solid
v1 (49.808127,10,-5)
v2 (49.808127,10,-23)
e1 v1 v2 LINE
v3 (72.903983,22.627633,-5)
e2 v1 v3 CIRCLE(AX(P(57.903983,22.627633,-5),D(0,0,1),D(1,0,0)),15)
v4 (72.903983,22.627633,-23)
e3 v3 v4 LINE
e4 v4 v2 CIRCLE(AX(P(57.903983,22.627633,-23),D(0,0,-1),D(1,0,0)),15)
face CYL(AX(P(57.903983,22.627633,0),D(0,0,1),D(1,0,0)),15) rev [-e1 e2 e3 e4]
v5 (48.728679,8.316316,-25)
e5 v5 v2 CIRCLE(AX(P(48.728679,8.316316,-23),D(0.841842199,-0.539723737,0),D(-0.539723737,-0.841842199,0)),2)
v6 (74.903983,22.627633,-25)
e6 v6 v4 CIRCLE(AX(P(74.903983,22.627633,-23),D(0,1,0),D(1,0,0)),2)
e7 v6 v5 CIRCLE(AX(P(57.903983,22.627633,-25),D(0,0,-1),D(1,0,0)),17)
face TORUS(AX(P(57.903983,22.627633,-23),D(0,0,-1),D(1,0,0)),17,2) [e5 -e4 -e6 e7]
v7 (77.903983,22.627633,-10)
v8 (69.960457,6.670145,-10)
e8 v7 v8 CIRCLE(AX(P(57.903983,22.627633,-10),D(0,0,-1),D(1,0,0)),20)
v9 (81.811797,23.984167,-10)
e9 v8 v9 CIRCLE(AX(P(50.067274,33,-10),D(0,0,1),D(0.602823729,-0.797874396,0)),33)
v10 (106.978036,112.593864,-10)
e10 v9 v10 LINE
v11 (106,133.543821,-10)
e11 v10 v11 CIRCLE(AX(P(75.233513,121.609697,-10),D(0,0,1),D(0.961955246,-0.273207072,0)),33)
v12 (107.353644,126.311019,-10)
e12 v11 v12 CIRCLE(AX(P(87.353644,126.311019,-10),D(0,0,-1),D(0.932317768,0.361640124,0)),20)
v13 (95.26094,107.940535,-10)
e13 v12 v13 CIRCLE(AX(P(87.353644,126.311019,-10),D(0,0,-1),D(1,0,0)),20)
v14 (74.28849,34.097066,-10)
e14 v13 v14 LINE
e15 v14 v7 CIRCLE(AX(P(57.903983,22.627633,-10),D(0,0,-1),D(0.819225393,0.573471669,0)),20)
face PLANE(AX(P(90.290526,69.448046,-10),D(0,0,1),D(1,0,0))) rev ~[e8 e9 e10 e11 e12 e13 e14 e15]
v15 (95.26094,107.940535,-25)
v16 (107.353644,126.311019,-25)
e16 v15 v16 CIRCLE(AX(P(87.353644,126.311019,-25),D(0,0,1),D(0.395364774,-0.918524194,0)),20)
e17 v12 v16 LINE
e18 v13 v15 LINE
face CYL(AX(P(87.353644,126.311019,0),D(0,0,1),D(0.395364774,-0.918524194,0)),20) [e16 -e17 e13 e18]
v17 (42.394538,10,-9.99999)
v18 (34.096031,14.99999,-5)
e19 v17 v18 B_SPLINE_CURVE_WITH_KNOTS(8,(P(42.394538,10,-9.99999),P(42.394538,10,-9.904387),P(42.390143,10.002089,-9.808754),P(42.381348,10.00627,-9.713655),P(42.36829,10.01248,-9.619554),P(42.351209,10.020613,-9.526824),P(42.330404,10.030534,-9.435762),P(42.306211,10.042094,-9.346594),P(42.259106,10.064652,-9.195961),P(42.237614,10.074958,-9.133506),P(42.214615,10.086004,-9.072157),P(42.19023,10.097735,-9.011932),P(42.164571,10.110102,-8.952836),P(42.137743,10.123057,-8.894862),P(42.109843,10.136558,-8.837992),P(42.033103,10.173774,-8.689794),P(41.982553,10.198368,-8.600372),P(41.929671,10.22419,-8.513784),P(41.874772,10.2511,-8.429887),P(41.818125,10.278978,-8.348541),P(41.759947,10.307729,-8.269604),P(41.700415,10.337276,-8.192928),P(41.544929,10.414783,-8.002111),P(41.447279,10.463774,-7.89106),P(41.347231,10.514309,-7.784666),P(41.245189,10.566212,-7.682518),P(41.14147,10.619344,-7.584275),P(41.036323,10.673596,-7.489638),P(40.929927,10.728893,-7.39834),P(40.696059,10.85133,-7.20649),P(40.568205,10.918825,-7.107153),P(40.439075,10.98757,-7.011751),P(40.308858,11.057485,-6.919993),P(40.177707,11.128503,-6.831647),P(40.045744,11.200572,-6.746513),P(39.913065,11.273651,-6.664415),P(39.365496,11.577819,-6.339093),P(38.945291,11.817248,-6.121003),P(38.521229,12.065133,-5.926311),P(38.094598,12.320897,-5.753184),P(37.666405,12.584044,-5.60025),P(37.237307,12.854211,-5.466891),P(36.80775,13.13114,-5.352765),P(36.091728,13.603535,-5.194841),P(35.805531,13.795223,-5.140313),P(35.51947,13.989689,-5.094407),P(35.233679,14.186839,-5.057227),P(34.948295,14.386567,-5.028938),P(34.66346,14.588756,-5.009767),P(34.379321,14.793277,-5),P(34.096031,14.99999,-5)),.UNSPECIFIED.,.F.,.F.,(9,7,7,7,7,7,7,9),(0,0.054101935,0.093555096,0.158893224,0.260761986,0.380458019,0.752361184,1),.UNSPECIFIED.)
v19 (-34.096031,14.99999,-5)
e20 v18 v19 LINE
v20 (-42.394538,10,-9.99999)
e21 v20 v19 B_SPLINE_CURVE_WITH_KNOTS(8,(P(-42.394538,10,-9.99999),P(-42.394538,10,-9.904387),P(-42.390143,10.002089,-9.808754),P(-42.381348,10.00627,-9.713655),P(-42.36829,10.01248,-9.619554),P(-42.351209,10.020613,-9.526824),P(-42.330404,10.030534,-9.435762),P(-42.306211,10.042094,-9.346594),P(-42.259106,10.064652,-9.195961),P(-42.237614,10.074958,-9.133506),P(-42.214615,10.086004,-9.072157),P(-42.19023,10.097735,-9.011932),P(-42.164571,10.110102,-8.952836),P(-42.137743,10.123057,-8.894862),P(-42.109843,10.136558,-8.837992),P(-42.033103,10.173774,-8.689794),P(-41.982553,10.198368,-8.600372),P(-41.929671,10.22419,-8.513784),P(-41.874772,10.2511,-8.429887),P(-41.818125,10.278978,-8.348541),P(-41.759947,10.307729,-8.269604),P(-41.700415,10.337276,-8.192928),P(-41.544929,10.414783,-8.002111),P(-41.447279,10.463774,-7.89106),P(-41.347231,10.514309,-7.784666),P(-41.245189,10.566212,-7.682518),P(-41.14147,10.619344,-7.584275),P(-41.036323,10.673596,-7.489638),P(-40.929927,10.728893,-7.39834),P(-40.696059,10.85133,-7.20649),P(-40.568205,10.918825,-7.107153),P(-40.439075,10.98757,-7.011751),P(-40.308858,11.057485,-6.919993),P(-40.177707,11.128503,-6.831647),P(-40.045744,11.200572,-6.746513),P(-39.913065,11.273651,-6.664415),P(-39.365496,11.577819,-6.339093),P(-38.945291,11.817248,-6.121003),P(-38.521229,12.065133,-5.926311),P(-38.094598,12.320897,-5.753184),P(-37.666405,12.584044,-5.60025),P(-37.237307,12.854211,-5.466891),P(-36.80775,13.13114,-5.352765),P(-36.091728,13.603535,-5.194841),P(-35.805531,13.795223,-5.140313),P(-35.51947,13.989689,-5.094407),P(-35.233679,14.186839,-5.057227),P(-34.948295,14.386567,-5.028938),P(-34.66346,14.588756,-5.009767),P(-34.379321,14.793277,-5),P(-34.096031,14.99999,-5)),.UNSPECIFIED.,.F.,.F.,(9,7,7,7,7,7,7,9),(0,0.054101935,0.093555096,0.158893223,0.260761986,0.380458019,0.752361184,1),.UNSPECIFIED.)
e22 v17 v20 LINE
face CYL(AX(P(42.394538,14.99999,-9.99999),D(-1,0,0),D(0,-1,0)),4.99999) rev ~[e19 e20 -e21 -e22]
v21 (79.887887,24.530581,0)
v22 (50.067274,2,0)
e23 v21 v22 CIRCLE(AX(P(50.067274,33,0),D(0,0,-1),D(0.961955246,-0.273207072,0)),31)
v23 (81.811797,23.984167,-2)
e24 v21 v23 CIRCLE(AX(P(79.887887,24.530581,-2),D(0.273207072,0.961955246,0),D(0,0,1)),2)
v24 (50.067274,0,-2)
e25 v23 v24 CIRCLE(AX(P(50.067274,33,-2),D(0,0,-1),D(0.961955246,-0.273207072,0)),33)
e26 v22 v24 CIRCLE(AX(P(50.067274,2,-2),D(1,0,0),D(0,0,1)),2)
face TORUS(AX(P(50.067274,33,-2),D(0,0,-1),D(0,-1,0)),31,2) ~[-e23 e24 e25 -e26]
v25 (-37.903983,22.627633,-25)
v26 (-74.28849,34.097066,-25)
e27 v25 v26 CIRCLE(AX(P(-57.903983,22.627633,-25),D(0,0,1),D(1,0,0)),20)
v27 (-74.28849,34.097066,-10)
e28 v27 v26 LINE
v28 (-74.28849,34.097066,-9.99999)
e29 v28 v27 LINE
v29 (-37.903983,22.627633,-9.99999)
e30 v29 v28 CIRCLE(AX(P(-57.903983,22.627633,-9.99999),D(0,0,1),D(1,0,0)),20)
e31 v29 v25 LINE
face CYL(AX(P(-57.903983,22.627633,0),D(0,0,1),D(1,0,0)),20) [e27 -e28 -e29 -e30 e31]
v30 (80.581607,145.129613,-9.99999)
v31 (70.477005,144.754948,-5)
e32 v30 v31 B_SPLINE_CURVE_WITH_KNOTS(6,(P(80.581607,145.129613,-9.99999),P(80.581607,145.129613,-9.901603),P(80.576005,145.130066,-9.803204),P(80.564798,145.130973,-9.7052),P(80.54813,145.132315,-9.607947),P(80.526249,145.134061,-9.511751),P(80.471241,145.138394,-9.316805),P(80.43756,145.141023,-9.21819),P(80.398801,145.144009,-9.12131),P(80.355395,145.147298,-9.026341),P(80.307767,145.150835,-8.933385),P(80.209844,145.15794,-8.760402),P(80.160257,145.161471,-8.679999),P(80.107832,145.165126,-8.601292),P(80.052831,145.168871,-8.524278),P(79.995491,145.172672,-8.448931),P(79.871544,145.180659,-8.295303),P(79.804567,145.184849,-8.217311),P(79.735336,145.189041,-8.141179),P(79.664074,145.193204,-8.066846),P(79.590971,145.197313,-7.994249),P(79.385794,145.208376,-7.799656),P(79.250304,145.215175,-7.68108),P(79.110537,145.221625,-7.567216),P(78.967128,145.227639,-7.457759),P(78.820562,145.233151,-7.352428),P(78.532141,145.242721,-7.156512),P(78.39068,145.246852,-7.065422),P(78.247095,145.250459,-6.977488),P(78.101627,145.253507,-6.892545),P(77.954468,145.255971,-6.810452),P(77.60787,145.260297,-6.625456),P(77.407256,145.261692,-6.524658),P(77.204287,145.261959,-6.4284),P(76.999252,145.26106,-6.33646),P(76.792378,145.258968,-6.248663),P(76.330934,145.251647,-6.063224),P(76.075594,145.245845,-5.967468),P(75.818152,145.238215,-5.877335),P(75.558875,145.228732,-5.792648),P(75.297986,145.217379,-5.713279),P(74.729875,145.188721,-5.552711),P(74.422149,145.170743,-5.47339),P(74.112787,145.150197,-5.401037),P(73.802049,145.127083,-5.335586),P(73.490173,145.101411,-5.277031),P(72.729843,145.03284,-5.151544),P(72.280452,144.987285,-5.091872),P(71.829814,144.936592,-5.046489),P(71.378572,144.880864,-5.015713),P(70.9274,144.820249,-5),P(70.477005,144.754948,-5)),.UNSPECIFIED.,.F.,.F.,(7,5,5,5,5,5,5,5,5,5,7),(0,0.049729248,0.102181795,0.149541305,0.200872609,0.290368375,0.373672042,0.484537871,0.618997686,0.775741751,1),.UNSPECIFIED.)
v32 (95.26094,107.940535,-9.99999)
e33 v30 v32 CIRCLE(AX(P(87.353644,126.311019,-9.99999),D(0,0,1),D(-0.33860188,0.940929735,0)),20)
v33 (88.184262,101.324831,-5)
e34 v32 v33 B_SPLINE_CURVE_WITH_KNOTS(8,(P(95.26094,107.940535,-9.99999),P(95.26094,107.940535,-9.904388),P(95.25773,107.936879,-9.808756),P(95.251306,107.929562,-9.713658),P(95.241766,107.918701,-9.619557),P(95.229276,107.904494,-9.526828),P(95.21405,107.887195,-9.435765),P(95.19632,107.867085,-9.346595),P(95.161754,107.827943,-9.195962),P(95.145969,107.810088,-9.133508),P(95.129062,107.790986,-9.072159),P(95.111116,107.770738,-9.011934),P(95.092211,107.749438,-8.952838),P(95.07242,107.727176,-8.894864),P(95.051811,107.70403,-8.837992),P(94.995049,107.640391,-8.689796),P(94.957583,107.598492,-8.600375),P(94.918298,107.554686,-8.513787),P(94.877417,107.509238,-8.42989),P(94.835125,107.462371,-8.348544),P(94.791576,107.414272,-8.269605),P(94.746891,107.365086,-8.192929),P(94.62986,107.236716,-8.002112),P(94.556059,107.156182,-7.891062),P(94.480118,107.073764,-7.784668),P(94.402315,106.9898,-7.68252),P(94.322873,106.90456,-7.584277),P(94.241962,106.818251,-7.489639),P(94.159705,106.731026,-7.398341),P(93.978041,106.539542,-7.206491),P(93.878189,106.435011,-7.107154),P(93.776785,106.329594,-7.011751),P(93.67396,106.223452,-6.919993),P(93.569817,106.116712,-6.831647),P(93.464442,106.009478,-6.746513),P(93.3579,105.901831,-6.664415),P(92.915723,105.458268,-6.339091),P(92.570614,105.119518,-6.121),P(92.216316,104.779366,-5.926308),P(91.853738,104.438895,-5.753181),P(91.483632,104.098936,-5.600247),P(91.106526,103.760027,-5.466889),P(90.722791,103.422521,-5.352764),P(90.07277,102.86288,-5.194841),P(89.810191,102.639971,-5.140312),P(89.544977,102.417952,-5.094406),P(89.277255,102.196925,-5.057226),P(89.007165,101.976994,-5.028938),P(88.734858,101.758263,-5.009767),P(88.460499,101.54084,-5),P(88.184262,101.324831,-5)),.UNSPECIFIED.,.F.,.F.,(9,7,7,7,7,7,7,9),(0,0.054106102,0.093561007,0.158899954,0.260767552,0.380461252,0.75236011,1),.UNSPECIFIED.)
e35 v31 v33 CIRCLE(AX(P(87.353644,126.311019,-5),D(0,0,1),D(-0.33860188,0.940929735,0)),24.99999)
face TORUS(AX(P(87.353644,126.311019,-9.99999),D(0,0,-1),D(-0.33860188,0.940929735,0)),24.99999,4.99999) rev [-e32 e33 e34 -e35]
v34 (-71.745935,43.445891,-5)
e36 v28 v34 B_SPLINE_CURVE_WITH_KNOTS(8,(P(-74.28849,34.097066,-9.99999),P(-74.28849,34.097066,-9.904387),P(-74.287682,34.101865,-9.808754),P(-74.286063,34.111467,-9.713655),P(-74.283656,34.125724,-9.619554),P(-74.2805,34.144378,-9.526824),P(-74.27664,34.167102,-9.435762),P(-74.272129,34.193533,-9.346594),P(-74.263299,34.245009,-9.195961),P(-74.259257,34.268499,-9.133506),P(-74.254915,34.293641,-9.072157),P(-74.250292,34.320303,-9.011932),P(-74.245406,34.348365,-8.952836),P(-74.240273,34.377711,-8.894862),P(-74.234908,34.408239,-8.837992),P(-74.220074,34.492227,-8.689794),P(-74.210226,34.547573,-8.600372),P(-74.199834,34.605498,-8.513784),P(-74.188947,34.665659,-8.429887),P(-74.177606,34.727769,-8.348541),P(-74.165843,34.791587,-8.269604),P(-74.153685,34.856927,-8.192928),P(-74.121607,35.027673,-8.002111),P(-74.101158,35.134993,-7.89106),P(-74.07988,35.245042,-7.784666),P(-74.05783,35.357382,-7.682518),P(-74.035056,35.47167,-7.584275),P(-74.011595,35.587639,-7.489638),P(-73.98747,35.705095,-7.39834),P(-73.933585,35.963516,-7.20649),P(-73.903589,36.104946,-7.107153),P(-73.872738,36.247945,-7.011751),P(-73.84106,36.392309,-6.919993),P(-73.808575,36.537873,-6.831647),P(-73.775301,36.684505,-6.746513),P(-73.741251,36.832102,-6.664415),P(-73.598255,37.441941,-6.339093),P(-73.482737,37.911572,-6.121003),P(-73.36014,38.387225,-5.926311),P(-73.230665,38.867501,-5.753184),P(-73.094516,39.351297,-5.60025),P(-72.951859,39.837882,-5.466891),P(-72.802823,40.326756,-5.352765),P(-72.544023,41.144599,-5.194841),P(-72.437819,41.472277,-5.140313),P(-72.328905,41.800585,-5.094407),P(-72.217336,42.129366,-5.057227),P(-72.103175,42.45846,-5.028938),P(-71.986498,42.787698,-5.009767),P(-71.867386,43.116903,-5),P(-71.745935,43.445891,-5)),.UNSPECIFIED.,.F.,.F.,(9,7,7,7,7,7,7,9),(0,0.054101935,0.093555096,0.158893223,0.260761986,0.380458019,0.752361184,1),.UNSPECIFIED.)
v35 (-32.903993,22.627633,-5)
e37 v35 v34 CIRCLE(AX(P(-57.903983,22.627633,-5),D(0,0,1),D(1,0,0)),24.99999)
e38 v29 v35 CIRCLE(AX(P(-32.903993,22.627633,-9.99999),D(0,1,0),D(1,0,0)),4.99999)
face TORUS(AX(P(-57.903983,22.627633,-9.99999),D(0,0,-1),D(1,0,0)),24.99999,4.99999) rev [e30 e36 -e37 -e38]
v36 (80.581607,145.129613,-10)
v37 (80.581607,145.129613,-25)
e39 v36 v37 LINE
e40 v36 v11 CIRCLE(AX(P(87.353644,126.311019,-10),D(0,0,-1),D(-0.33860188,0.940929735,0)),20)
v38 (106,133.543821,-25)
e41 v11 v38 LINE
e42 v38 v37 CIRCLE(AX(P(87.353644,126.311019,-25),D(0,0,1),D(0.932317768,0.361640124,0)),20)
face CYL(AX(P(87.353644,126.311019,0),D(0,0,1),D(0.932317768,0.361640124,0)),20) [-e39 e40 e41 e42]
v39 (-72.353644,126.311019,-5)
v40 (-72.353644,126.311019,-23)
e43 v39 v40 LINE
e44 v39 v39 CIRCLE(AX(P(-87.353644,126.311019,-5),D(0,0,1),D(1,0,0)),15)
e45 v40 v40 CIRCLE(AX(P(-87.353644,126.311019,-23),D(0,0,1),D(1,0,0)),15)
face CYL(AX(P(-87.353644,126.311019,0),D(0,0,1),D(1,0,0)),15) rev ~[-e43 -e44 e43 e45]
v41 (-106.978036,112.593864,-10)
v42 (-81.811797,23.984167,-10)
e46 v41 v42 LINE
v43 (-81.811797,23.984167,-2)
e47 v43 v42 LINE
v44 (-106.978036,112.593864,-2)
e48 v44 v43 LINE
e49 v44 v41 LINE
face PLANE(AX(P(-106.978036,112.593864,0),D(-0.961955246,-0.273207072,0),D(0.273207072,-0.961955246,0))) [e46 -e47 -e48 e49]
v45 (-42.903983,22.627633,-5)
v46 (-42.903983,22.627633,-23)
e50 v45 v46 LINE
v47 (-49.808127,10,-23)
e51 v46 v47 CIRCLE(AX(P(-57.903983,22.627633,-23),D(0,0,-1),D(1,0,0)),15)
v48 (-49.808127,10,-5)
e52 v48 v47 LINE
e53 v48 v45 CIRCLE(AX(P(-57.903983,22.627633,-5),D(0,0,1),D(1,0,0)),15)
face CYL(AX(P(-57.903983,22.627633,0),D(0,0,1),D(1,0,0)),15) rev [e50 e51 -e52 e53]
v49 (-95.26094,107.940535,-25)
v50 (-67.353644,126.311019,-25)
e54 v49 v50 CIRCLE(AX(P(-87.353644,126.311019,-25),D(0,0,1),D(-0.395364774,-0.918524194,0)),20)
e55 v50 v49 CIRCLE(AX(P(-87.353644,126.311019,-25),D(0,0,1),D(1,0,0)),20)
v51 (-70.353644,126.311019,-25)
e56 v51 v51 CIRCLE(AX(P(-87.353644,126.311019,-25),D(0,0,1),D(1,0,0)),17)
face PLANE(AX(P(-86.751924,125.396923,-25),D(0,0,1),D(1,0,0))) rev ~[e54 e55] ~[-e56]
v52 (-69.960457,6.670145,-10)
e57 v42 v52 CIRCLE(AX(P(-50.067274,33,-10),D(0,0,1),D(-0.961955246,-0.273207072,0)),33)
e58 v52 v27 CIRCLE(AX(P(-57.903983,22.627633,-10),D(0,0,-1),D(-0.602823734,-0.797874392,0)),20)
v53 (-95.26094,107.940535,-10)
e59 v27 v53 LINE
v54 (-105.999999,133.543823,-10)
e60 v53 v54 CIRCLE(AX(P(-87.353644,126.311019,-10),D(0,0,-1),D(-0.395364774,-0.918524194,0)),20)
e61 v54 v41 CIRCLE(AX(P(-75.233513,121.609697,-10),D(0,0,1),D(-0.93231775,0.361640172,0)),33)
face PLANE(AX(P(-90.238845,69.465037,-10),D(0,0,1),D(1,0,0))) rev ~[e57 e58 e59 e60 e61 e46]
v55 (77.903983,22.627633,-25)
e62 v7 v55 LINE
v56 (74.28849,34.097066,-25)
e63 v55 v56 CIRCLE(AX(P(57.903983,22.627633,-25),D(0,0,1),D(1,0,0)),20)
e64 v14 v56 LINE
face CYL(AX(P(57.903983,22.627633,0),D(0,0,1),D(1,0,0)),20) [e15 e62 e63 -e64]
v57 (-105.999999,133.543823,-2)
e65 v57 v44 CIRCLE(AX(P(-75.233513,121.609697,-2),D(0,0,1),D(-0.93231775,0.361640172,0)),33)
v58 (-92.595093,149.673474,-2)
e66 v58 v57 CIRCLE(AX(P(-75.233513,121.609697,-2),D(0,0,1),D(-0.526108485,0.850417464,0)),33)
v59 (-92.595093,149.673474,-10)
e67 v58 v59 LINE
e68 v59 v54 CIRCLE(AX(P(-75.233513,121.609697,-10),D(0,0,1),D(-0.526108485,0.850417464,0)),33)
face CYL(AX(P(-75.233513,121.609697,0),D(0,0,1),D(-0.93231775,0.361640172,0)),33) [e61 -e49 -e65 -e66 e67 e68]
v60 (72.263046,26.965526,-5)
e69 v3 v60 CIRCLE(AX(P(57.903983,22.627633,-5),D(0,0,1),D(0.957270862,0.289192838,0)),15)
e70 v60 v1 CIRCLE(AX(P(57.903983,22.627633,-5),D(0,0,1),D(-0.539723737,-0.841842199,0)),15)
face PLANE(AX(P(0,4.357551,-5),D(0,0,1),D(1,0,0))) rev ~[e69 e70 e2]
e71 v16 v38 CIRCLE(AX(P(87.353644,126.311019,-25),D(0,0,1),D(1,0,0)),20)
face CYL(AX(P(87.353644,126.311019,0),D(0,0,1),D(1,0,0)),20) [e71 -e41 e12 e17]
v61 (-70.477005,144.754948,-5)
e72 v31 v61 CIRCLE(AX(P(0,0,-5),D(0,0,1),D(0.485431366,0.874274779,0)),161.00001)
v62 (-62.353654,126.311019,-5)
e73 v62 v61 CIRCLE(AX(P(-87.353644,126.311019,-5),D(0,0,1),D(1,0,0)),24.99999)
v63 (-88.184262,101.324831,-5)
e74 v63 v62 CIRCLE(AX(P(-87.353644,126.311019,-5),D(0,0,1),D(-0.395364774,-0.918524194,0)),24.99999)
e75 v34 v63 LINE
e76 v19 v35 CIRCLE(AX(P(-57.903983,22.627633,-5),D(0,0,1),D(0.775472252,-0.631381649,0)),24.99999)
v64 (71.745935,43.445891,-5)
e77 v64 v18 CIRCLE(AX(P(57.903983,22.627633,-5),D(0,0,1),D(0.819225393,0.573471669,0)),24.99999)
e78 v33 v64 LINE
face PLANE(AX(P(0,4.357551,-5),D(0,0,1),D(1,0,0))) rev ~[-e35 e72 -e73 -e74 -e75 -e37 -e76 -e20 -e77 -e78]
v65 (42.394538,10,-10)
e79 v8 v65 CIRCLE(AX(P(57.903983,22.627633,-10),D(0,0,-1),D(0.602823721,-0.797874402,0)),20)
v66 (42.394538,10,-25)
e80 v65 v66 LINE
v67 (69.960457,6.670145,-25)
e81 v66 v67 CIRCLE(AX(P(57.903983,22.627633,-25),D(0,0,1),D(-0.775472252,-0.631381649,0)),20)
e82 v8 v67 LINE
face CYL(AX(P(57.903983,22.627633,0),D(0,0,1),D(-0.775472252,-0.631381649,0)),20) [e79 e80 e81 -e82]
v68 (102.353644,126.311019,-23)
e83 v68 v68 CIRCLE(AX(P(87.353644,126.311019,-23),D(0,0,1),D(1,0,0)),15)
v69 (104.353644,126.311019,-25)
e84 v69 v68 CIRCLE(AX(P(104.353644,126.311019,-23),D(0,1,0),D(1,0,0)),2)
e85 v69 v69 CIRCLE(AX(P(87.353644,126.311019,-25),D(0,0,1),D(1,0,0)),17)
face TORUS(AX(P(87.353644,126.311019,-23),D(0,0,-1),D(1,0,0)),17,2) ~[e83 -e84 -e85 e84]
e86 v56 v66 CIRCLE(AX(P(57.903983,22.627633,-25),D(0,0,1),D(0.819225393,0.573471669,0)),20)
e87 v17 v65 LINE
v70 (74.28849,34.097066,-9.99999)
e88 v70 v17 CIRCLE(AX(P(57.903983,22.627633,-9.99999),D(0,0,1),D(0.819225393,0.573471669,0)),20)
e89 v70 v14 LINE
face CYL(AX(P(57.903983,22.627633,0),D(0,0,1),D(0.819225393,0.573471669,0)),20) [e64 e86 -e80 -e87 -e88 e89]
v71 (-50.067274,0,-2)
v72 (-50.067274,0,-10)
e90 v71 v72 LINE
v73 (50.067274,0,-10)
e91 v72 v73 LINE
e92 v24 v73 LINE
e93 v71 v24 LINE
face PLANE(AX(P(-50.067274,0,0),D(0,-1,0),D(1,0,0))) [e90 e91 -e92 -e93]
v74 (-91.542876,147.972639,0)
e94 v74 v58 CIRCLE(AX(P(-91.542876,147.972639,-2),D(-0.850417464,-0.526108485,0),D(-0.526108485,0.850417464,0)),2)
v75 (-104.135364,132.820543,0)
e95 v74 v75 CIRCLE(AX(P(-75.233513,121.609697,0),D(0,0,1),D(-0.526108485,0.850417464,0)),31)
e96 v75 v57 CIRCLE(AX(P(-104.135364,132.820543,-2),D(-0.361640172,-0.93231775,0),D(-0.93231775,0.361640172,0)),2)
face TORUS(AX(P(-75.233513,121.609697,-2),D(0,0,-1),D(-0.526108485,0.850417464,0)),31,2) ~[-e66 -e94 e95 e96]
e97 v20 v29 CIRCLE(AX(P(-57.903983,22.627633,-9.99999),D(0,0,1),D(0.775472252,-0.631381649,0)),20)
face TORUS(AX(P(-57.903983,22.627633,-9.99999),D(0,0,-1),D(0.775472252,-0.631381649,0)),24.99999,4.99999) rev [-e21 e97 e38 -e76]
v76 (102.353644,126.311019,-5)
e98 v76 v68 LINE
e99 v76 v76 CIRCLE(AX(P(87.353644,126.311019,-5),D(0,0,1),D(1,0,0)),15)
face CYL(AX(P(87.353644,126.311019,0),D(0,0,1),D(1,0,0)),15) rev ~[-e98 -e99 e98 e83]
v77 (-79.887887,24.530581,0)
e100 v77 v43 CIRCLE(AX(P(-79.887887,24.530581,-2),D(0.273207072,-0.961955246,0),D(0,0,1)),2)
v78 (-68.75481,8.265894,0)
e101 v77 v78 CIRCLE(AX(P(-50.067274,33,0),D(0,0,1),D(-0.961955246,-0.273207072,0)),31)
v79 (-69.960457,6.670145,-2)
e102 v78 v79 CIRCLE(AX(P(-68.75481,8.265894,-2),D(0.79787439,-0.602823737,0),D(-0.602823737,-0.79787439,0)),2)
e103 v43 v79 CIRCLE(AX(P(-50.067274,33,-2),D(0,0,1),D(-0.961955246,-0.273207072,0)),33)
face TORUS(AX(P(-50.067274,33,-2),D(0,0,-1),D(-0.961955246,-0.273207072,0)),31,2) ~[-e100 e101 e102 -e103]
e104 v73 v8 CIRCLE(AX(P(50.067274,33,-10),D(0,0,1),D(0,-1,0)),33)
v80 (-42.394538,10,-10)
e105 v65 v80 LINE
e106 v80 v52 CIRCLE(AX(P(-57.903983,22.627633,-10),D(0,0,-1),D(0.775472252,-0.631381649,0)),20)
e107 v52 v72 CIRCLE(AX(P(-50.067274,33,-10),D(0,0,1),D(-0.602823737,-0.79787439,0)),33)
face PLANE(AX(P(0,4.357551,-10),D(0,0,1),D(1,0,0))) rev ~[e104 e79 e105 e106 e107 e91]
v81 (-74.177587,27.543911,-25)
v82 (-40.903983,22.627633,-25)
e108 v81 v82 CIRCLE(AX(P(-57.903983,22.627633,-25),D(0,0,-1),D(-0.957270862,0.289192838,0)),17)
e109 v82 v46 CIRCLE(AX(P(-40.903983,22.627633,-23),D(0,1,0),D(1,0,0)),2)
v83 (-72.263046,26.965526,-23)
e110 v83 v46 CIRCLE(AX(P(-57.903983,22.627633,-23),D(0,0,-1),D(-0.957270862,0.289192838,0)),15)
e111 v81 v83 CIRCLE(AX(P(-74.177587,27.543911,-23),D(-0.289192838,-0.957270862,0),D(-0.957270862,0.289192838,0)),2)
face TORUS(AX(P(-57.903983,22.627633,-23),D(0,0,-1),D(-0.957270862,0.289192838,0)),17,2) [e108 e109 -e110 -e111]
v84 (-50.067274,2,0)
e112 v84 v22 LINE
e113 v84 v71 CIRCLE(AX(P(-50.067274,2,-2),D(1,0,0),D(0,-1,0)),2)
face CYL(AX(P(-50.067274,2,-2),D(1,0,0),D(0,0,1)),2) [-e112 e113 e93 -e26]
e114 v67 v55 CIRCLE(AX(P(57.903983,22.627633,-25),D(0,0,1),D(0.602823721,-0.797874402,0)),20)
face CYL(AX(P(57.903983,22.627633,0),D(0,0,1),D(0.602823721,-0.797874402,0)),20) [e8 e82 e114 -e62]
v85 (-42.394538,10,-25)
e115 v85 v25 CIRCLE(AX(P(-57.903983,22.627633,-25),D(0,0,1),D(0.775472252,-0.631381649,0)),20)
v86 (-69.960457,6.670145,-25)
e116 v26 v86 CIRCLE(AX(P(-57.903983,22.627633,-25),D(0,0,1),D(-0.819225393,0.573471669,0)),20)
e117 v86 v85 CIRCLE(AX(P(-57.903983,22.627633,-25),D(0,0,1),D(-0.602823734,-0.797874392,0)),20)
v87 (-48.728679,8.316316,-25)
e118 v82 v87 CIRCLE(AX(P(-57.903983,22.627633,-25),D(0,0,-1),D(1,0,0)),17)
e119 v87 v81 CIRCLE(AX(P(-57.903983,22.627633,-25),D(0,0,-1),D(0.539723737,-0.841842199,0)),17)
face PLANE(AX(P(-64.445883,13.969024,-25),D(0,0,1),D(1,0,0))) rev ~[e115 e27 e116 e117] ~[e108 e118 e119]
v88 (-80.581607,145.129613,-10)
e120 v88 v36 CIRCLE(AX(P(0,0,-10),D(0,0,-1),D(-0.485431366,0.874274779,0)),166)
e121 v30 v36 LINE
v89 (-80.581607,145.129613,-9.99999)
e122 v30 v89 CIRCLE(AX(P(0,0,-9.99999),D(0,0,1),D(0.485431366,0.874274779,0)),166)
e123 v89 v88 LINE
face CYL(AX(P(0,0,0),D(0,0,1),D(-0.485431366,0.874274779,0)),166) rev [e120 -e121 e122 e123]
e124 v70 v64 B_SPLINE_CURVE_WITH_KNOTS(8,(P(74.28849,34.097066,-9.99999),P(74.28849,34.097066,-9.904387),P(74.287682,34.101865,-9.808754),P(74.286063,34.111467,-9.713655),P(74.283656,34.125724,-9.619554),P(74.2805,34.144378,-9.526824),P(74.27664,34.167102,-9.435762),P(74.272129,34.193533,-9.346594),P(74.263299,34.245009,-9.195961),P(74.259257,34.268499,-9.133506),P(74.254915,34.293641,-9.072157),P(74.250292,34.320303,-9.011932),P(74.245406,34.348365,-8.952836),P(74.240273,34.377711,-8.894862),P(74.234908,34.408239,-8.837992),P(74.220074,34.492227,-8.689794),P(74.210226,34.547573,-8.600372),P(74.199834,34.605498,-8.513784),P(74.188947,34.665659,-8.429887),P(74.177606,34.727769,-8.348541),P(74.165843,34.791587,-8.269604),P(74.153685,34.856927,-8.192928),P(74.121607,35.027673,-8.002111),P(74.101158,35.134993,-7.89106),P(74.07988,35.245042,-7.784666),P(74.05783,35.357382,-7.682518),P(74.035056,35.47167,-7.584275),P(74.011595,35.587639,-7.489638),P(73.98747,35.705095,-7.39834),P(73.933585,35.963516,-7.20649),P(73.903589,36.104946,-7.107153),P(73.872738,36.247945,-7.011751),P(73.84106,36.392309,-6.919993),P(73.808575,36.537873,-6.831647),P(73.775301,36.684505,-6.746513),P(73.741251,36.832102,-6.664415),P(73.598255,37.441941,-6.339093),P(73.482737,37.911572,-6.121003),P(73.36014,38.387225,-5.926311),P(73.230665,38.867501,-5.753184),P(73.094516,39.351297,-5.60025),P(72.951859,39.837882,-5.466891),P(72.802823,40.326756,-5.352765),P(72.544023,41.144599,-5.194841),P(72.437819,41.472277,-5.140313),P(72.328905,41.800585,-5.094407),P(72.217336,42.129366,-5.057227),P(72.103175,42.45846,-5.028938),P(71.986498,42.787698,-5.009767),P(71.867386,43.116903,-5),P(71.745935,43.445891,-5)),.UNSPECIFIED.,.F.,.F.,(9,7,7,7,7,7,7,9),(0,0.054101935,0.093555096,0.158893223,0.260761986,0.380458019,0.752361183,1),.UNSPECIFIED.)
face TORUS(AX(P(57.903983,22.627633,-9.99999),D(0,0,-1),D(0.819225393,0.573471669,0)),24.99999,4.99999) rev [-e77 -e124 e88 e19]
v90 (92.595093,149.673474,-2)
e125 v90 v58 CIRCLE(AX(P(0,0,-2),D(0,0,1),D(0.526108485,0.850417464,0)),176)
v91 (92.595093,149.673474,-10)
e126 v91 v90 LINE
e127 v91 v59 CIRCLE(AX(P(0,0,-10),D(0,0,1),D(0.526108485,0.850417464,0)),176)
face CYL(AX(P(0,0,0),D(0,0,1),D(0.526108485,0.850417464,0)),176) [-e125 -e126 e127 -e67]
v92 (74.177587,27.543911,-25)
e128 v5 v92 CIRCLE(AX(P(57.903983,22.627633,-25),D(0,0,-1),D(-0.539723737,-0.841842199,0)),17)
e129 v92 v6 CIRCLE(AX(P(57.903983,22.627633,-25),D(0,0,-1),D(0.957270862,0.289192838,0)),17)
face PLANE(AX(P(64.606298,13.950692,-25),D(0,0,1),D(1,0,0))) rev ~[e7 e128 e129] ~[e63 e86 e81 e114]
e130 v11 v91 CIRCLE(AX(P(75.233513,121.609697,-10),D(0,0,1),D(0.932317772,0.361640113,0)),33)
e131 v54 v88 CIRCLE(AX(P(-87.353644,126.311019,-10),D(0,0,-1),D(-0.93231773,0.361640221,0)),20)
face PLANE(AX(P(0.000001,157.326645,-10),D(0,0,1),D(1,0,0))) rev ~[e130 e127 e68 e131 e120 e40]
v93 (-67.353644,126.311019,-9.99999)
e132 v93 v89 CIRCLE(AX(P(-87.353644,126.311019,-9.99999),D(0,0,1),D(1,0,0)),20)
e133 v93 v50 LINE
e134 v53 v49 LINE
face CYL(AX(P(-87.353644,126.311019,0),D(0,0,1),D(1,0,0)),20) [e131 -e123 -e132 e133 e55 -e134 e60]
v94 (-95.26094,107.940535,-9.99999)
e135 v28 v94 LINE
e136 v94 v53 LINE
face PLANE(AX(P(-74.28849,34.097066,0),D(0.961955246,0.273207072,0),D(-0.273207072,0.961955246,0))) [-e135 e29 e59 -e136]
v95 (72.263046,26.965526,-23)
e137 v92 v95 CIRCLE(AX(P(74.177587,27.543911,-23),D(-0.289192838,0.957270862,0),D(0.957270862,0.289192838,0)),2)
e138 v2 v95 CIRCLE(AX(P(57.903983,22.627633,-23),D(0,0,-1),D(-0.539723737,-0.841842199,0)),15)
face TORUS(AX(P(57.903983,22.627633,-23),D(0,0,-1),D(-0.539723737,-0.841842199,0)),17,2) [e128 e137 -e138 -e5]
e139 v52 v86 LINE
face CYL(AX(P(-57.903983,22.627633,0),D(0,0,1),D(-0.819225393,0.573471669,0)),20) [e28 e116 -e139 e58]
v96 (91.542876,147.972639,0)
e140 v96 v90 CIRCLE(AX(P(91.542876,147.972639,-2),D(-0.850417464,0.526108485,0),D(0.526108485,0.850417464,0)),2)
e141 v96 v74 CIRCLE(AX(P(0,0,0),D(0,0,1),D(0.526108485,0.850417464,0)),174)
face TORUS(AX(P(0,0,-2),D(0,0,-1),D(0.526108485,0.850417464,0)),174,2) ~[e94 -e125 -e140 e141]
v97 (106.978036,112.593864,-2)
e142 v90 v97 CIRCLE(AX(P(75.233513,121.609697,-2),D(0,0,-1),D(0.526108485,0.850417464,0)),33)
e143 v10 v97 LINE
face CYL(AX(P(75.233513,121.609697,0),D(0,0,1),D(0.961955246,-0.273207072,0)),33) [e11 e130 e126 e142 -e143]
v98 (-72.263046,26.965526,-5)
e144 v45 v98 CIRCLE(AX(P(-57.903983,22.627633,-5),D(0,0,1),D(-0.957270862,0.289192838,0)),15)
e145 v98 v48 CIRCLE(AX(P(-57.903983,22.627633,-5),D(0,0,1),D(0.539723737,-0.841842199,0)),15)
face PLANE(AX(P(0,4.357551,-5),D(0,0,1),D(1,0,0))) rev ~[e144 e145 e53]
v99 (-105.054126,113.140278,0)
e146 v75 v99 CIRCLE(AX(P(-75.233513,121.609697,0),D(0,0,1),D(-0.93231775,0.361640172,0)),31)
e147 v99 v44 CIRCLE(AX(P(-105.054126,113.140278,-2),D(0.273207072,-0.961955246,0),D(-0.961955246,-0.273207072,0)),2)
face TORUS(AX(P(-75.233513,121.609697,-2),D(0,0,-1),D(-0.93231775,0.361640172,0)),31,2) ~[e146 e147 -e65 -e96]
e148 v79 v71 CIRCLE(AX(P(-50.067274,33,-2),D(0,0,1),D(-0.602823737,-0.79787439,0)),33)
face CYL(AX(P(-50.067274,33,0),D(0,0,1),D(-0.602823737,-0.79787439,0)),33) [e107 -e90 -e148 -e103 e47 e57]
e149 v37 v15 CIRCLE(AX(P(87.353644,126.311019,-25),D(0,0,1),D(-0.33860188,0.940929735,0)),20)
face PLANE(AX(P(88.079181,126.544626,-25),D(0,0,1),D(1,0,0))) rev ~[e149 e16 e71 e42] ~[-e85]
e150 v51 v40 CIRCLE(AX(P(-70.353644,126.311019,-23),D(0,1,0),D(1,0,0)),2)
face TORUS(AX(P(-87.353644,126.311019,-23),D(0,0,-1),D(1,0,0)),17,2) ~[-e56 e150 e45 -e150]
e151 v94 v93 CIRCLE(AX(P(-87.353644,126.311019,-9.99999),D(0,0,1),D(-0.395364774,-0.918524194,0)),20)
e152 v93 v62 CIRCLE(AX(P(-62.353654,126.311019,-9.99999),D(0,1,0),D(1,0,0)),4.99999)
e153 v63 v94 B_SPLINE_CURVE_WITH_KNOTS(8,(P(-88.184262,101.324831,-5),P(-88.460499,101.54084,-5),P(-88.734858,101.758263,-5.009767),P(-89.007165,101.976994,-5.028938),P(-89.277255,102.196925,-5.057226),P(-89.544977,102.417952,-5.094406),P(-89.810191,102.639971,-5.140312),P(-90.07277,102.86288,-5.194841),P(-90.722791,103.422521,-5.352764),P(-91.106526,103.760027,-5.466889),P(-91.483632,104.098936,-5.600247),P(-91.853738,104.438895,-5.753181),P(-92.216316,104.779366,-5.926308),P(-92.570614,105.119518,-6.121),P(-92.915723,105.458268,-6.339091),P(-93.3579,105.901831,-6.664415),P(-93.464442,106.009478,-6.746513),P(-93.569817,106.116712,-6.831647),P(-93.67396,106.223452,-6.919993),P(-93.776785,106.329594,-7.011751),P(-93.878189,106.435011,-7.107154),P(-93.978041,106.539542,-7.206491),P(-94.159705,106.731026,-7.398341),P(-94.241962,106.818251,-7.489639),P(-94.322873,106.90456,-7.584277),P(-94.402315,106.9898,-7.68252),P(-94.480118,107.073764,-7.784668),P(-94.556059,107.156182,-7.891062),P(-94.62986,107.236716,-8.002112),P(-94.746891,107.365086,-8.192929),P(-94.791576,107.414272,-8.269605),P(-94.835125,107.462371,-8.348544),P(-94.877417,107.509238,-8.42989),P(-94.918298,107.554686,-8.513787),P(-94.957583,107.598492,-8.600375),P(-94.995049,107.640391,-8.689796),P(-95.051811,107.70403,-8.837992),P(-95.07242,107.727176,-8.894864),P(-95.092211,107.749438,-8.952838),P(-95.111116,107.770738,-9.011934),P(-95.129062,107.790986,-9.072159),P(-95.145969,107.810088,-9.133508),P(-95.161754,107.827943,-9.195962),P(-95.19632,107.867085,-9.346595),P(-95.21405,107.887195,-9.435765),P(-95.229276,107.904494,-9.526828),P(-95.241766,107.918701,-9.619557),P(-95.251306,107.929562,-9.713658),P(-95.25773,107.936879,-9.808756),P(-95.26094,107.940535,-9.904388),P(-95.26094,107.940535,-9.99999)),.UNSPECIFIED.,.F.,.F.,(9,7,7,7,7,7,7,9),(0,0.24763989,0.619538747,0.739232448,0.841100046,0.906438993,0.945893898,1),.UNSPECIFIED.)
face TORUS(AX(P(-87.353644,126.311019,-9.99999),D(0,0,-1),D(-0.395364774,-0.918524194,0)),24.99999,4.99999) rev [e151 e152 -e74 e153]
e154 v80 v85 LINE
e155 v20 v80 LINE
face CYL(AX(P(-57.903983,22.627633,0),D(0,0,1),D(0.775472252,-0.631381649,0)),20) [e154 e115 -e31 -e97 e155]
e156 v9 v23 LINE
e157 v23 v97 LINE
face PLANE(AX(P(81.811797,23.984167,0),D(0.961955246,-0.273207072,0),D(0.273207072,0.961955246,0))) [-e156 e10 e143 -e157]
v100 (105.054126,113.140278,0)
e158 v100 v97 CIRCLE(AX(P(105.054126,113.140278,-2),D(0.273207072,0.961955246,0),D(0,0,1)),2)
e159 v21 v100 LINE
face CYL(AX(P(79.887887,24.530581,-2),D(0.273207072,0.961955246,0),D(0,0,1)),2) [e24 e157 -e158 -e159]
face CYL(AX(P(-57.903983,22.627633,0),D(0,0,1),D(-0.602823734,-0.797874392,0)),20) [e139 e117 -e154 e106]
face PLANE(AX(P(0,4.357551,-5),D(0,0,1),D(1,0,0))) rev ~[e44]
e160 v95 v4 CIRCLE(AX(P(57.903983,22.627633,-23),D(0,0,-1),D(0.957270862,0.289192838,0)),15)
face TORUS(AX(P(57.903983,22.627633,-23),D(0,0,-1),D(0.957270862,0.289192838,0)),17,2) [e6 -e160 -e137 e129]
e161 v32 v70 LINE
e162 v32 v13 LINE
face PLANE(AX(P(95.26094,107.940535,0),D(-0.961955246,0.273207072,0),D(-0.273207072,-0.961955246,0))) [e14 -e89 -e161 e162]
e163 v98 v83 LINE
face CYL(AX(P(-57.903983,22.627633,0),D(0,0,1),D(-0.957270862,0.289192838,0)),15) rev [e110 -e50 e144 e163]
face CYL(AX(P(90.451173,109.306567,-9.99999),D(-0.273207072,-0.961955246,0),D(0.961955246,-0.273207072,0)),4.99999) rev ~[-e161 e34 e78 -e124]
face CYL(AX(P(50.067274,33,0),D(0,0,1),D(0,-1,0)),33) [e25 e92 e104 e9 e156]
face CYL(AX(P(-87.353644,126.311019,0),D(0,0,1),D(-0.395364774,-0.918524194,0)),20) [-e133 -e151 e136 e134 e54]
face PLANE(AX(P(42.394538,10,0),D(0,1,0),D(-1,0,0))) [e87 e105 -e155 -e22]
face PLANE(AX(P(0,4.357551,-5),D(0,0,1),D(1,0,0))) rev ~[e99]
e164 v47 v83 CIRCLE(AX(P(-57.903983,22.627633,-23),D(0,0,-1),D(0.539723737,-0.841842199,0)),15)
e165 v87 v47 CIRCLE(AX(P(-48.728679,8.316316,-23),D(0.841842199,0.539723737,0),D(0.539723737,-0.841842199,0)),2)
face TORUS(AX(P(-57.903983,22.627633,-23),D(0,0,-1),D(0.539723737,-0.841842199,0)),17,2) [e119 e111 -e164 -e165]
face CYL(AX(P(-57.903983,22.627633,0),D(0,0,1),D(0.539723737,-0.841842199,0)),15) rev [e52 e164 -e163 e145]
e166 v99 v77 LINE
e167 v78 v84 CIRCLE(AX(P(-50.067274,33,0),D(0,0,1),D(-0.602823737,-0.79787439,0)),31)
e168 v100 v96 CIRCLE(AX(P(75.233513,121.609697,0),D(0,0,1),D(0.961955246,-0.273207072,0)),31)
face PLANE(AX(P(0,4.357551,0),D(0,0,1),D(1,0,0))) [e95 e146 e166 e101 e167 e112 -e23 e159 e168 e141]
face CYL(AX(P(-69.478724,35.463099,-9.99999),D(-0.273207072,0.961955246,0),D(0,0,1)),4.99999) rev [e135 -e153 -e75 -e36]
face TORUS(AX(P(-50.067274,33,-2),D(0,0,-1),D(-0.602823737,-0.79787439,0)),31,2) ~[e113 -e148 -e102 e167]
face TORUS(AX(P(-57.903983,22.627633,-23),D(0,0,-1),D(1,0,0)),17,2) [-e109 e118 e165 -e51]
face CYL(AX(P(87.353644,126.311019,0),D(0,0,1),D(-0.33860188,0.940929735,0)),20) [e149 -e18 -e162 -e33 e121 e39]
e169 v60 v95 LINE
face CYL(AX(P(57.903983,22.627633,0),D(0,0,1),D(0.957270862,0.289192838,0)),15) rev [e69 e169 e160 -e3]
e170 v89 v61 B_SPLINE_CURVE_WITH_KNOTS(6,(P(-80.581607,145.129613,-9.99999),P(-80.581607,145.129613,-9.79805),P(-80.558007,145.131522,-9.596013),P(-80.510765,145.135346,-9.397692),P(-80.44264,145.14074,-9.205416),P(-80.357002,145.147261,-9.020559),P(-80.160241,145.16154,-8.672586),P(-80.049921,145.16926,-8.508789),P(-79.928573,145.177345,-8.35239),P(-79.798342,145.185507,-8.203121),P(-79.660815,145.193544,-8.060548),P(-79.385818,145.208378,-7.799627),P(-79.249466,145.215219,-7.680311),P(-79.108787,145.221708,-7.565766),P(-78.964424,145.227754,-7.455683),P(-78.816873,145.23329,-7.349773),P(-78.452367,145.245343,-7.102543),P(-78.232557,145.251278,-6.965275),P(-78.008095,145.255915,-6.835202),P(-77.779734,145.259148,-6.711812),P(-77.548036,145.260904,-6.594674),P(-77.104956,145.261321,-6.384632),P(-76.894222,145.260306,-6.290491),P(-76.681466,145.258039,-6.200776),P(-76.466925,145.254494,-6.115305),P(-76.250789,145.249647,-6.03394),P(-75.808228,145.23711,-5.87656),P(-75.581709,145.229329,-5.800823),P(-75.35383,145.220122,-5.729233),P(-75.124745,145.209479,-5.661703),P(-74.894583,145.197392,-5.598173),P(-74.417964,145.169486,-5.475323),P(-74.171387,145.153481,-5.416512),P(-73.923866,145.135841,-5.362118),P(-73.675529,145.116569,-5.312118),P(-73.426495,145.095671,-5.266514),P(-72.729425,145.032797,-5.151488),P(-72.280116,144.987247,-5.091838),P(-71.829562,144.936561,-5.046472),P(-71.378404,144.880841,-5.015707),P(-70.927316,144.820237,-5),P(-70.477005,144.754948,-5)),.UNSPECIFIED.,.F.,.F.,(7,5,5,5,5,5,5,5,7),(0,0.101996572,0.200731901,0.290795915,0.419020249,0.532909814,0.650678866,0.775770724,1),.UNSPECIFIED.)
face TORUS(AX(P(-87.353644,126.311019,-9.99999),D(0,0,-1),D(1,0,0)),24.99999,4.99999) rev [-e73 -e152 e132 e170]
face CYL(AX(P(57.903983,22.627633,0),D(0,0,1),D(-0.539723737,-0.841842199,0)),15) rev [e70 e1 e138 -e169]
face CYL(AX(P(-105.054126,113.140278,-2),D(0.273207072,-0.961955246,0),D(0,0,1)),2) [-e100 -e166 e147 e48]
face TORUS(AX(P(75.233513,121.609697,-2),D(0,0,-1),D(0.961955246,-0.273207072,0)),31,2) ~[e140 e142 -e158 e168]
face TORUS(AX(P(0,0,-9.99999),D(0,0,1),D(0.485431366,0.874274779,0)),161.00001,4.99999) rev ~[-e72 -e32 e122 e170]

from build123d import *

# Parameters (mm, degrees)
F0_R     = 15
F1_DEPTH = 5
F2_DEPTH = 25
F3_DEPTH = 10
F4_R     = 2
F5_R     = 4.99999


# Not quite as in the source:
# - a fillet or chamfer is up to 0.001 mm smaller than in the source, because OpenCascade refuses the exact size


with BuildPart() as f1:
    # F0 (on Top) → F1 (new body)
    with BuildSketch(Plane.XY):
        with BuildLine():
            ThreePointArc((-69.9604572753, 6.6701451311), (-60.5580982639, 1.7119414898), (-50.0672739559, 0))
            Line((-50.0672739559, 0), (0, 0))
            Line((0, 0), (50.0672739559, 0))
            ThreePointArc((50.0672739559, 0), (60.5580981143, 1.7119414396), (69.9604570235, 6.6701449408))
            ThreePointArc((69.9604570235, 6.6701449408), (55.5054965809, 2.7719722055), (42.3945375666, 10))
            Line((42.3945375666, 10), (0, 10))
            Line((0, 10), (-42.3945375666, 10))
            ThreePointArc((-42.3945375666, 10), (-55.5054967376, 2.7719721865), (-69.9604572753, 6.6701451311))
        make_face()
        with BuildLine():
            ThreePointArc((-81.8117970817, 23.9841666211), (-77.2988184727, 14.3601774893), (-69.9604572753, 6.6701451311))
            ThreePointArc((-69.9604572753, 6.6701451311), (-77.6595229381, 19.5101618836), (-74.2884904631, 34.0970663646))
            Line((-74.2884904631, 34.0970663646), (-95.2609399047, 107.9405346638))
            ThreePointArc((-95.2609399047, 107.9405346638), (-105.7969677746, 118.575139565), (-105.9999990268, 133.5438229737))
            ThreePointArc((-105.9999990268, 133.5438229737), (-108.1976112364, 123.1486082025), (-106.9780364185, 112.5938639221))
            Line((-106.9780364185, 112.5938639221), (-81.8117970817, 23.9841666211))
        make_face()
        with BuildLine():
            ThreePointArc((-74.2884904631, 34.0970663646), (-77.6595229381, 19.5101618836), (-69.9604572753, 6.6701451311))
            ThreePointArc((-69.9604572753, 6.6701451311), (-55.5054967376, 2.7719721865), (-42.3945375666, 10))
            Line((-42.3945375666, 10), (-49.8081265441, 10))
            ThreePointArc((-49.8081265441, 10), (-66.9463387327, 10.6595171883), (-72.2630455249, 26.9655255543))
            Line((-72.2630455249, 26.9655255543), (-74.2884904631, 34.0970663646))
        make_face()
        with BuildLine():
            ThreePointArc((-37.9039826023, 22.6276329803), (-51.8910863458, 41.7023565329), (-74.2884904631, 34.0970663646))
            Line((-74.2884904631, 34.0970663646), (-72.2630455249, 26.9655255543))
            ThreePointArc((-72.2630455249, 26.9655255543), (-55.7114890264, 37.4665336107), (-42.9039826023, 22.6276329803))
            ThreePointArc((-42.9039826023, 22.6276329803), (-44.7427166891, 15.4317258406), (-49.8081265441, 10))
            Line((-49.8081265441, 10), (-42.3945375666, 10))
            ThreePointArc((-42.3945375666, 10), (-39.0600326353, 15.9264726596), (-37.9039826023, 22.6276329803))
        make_face()
        with BuildLine():
            Line((-95.2609399047, 107.9405346638), (-74.2884904631, 34.0970663646))
            ThreePointArc((-74.2884904631, 34.0970663646), (-51.8910863458, 41.7023565329), (-37.9039826023, 22.6276329803))
            ThreePointArc((-37.9039826023, 22.6276329803), (-39.0600326353, 15.9264726596), (-42.3945375666, 10))
            Line((-42.3945375666, 10), (0, 10))
            Line((0, 10), (42.3945375666, 10))
            ThreePointArc((42.3945375666, 10), (45.8475077617, 38.5851207029), (74.2884904631, 34.0970663646))
            Line((74.2884904631, 34.0970663646), (95.2609399047, 107.9405346638))
            ThreePointArc((95.2609399047, 107.9405346638), (68.7504432386, 118.9679329691), (80.581606816, 145.1296132529))
            ThreePointArc((80.581606816, 145.1296132529), (0, 166), (-80.581606816, 145.1296132529))
            ThreePointArc((-80.581606816, 145.1296132529), (-70.991481481, 137.8123064736), (-67.3536444198, 126.3110185474))
            ThreePointArc((-67.3536444198, 126.3110185474), (-76.3569610493, 109.6055417553), (-95.2609399047, 107.9405346638))
        make_face()
        with BuildLine():
            ThreePointArc((77.9039826023, 22.6276329803), (75.8083045445, 13.7149871449), (69.9604570235, 6.6701449408))
            ThreePointArc((69.9604570235, 6.6701449408), (77.2988183836, 14.3601773591), (81.8117970817, 23.9841666211))
            Line((81.8117970817, 23.9841666211), (106.9780364185, 112.5938639221))
            ThreePointArc((106.9780364185, 112.5938639221), (108.1976112852, 123.1486071561), (105.9999997845, 133.5438210204))
            ThreePointArc((105.9999997845, 133.5438210204), (107.0123207142, 129.990209539), (107.3536444198, 126.3110185474))
            ThreePointArc((107.3536444198, 126.3110185474), (104.0591212119, 115.3143351769), (95.2609399047, 107.9405346638))
            Line((95.2609399047, 107.9405346638), (74.2884904631, 34.0970663646))
            ThreePointArc((74.2884904631, 34.0970663646), (76.9787061549, 28.6405292368), (77.9039826023, 22.6276329803))
        make_face()
        with BuildLine():
            ThreePointArc((42.3945375666, 10), (55.5054965809, 2.7719722055), (69.9604570235, 6.6701449408))
            ThreePointArc((69.9604570235, 6.6701449408), (75.8083045445, 13.7149871449), (77.9039826023, 22.6276329803))
            ThreePointArc((77.9039826023, 22.6276329803), (76.9787061549, 28.6405292368), (74.2884904631, 34.0970663646))
            Line((74.2884904631, 34.0970663646), (72.2630455249, 26.9655255543))
            ThreePointArc((72.2630455249, 26.9655255543), (72.7428832327, 24.8201265562), (72.9039826023, 22.6276329803))
            ThreePointArc((72.9039826023, 22.6276329803), (65.099889742, 9.4663670672), (49.8081265441, 10))
            Line((49.8081265441, 10), (42.3945375666, 10))
        make_face()
        with BuildLine():
            ThreePointArc((-42.9039826023, 22.6276329803), (-55.7114890264, 37.4665336107), (-72.2630455249, 26.9655255543))
            Line((-72.2630455249, 26.9655255543), (-72.1922446193, 26.716237342))
            ThreePointArc((-72.1922446193, 26.716237342), (-63.9322200226, 14.648889119), (-50.0672739559, 10))
            Line((-50.0672739559, 10), (-49.8081265441, 10))
            ThreePointArc((-49.8081265441, 10), (-44.7427166891, 15.4317258406), (-42.9039826023, 22.6276329803))
        make_face()
        with BuildLine():
            Line((-72.1922446193, 26.716237342), (-72.2630455249, 26.9655255543))
            ThreePointArc((-72.2630455249, 26.9655255543), (-66.9463387327, 10.6595171883), (-49.8081265441, 10))
            Line((-49.8081265441, 10), (-50.0672739559, 10))
            ThreePointArc((-50.0672739559, 10), (-63.9322200226, 14.648889119), (-72.1922446193, 26.716237342))
        make_face()
        with BuildLine():
            ThreePointArc((-105.9999990268, 133.5438229737), (-105.7969677746, 118.575139565), (-95.2609399047, 107.9405346638))
            ThreePointArc((-95.2609399047, 107.9405346638), (-76.3569610493, 109.6055417553), (-67.3536444198, 126.3110185474))
            ThreePointArc((-67.3536444198, 126.3110185474), (-70.991481481, 137.8123064736), (-80.581606816, 145.1296132529))
            ThreePointArc((-80.581606816, 145.1296132529), (-95.6486721577, 144.5097139629), (-105.9999990268, 133.5438229737))
        make_face()
        with Locations((-87.3536444198, 126.3110185474)):
            Circle(F0_R, mode=Mode.SUBTRACT)
        with BuildLine():
            ThreePointArc((74.2884904631, 34.0970663646), (45.8475077617, 38.5851207029), (42.3945375666, 10))
            Line((42.3945375666, 10), (49.8081265441, 10))
            ThreePointArc((49.8081265441, 10), (48.8616264718, 34.5957487723), (72.2630455249, 26.9655255543))
            Line((72.2630455249, 26.9655255543), (74.2884904631, 34.0970663646))
        make_face()
        with BuildLine():
            ThreePointArc((-92.5950932834, 149.6734736012), (-100.6130145672, 142.701897638), (-105.9999990268, 133.5438229737))
            ThreePointArc((-105.9999990268, 133.5438229737), (-95.6486721577, 144.5097139629), (-80.581606816, 145.1296132529))
            ThreePointArc((-80.581606816, 145.1296132529), (0, 166), (80.581606816, 145.1296132529))
            ThreePointArc((80.581606816, 145.1296132529), (95.6486731109, 144.5097135284), (105.9999997845, 133.5438210204))
            ThreePointArc((105.9999997845, 133.5438210204), (100.6130152368, 142.7018968323), (92.5950932834, 149.6734736012))
            ThreePointArc((92.5950932834, 149.6734736012), (0, 176), (-92.5950932834, 149.6734736012))
        make_face()
        with BuildLine():
            ThreePointArc((72.2630455249, 26.9655255543), (48.8616264718, 34.5957487723), (49.8081265441, 10))
            Line((49.8081265441, 10), (50.0672739559, 10))
            ThreePointArc((50.0672739559, 10), (63.9322200226, 14.648889119), (72.1922446193, 26.716237342))
            Line((72.1922446193, 26.716237342), (72.2630455249, 26.9655255543))
        make_face()
        with BuildLine():
            Line((50.0672739559, 10), (49.8081265441, 10))
            ThreePointArc((49.8081265441, 10), (65.099889742, 9.4663670672), (72.9039826023, 22.6276329803))
            ThreePointArc((72.9039826023, 22.6276329803), (72.7428832327, 24.8201265562), (72.2630455249, 26.9655255543))
            Line((72.2630455249, 26.9655255543), (72.1922446193, 26.716237342))
            ThreePointArc((72.1922446193, 26.716237342), (63.9322200226, 14.648889119), (50.0672739559, 10))
        make_face()
        with BuildLine():
            ThreePointArc((107.3536444198, 126.3110185474), (107.0123207142, 129.990209539), (105.9999997845, 133.5438210204))
            ThreePointArc((105.9999997845, 133.5438210204), (95.6486731109, 144.5097135284), (80.581606816, 145.1296132529))
            ThreePointArc((80.581606816, 145.1296132529), (68.7504432386, 118.9679329691), (95.2609399047, 107.9405346638))
            ThreePointArc((95.2609399047, 107.9405346638), (104.0591212119, 115.3143351769), (107.3536444198, 126.3110185474))
        make_face()
        with Locations((87.3536444198, 126.3110185474)):
            Circle(F0_R, mode=Mode.SUBTRACT)
        with Locations((-87.3536444198, 126.3110185474)):
            Circle(F0_R)
        with Locations((87.3536444198, 126.3110185474)):
            Circle(F0_R)
    extrude(amount=-F1_DEPTH)

    # F0 (on Top) → F2 (join)
    with BuildSketch(Plane.XY):
        with BuildLine():
            ThreePointArc((-74.2884904631, 34.0970663646), (-77.6595229381, 19.5101618836), (-69.9604572753, 6.6701451311))
            ThreePointArc((-69.9604572753, 6.6701451311), (-55.5054967376, 2.7719721865), (-42.3945375666, 10))
            Line((-42.3945375666, 10), (-49.8081265441, 10))
            ThreePointArc((-49.8081265441, 10), (-66.9463387327, 10.6595171883), (-72.2630455249, 26.9655255543))
            Line((-72.2630455249, 26.9655255543), (-74.2884904631, 34.0970663646))
        make_face()
        with BuildLine():
            ThreePointArc((-37.9039826023, 22.6276329803), (-51.8910863458, 41.7023565329), (-74.2884904631, 34.0970663646))
            Line((-74.2884904631, 34.0970663646), (-72.2630455249, 26.9655255543))
            ThreePointArc((-72.2630455249, 26.9655255543), (-55.7114890264, 37.4665336107), (-42.9039826023, 22.6276329803))
            ThreePointArc((-42.9039826023, 22.6276329803), (-44.7427166891, 15.4317258406), (-49.8081265441, 10))
            Line((-49.8081265441, 10), (-42.3945375666, 10))
            ThreePointArc((-42.3945375666, 10), (-39.0600326353, 15.9264726596), (-37.9039826023, 22.6276329803))
        make_face()
        with BuildLine():
            ThreePointArc((42.3945375666, 10), (55.5054965809, 2.7719722055), (69.9604570235, 6.6701449408))
            ThreePointArc((69.9604570235, 6.6701449408), (75.8083045445, 13.7149871449), (77.9039826023, 22.6276329803))
            ThreePointArc((77.9039826023, 22.6276329803), (76.9787061549, 28.6405292368), (74.2884904631, 34.0970663646))
            Line((74.2884904631, 34.0970663646), (72.2630455249, 26.9655255543))
            ThreePointArc((72.2630455249, 26.9655255543), (72.7428832327, 24.8201265562), (72.9039826023, 22.6276329803))
            ThreePointArc((72.9039826023, 22.6276329803), (65.099889742, 9.4663670672), (49.8081265441, 10))
            Line((49.8081265441, 10), (42.3945375666, 10))
        make_face()
        with BuildLine():
            ThreePointArc((-105.9999990268, 133.5438229737), (-105.7969677746, 118.575139565), (-95.2609399047, 107.9405346638))
            ThreePointArc((-95.2609399047, 107.9405346638), (-76.3569610493, 109.6055417553), (-67.3536444198, 126.3110185474))
            ThreePointArc((-67.3536444198, 126.3110185474), (-70.991481481, 137.8123064736), (-80.581606816, 145.1296132529))
            ThreePointArc((-80.581606816, 145.1296132529), (-95.6486721577, 144.5097139629), (-105.9999990268, 133.5438229737))
        make_face()
        with Locations((-87.3536444198, 126.3110185474)):
            Circle(F0_R, mode=Mode.SUBTRACT)
        with BuildLine():
            ThreePointArc((74.2884904631, 34.0970663646), (45.8475077617, 38.5851207029), (42.3945375666, 10))
            Line((42.3945375666, 10), (49.8081265441, 10))
            ThreePointArc((49.8081265441, 10), (48.8616264718, 34.5957487723), (72.2630455249, 26.9655255543))
            Line((72.2630455249, 26.9655255543), (74.2884904631, 34.0970663646))
        make_face()
        with BuildLine():
            ThreePointArc((107.3536444198, 126.3110185474), (107.0123207142, 129.990209539), (105.9999997845, 133.5438210204))
            ThreePointArc((105.9999997845, 133.5438210204), (95.6486731109, 144.5097135284), (80.581606816, 145.1296132529))
            ThreePointArc((80.581606816, 145.1296132529), (68.7504432386, 118.9679329691), (95.2609399047, 107.9405346638))
            ThreePointArc((95.2609399047, 107.9405346638), (104.0591212119, 115.3143351769), (107.3536444198, 126.3110185474))
        make_face()
        with Locations((87.3536444198, 126.3110185474)):
            Circle(F0_R, mode=Mode.SUBTRACT)
    extrude(amount=-F2_DEPTH)

    # F0 (on Top) → F3 (join)
    with BuildSketch(Plane.XY):
        with BuildLine():
            ThreePointArc((-69.9604572753, 6.6701451311), (-60.5580982639, 1.7119414898), (-50.0672739559, 0))
            Line((-50.0672739559, 0), (0, 0))
            Line((0, 0), (50.0672739559, 0))
            ThreePointArc((50.0672739559, 0), (60.5580981143, 1.7119414396), (69.9604570235, 6.6701449408))
            ThreePointArc((69.9604570235, 6.6701449408), (55.5054965809, 2.7719722055), (42.3945375666, 10))
            Line((42.3945375666, 10), (0, 10))
            Line((0, 10), (-42.3945375666, 10))
            ThreePointArc((-42.3945375666, 10), (-55.5054967376, 2.7719721865), (-69.9604572753, 6.6701451311))
        make_face()
        with BuildLine():
            ThreePointArc((-81.8117970817, 23.9841666211), (-77.2988184727, 14.3601774893), (-69.9604572753, 6.6701451311))
            ThreePointArc((-69.9604572753, 6.6701451311), (-77.6595229381, 19.5101618836), (-74.2884904631, 34.0970663646))
            Line((-74.2884904631, 34.0970663646), (-95.2609399047, 107.9405346638))
            ThreePointArc((-95.2609399047, 107.9405346638), (-105.7969677746, 118.575139565), (-105.9999990268, 133.5438229737))
            ThreePointArc((-105.9999990268, 133.5438229737), (-108.1976112364, 123.1486082025), (-106.9780364185, 112.5938639221))
            Line((-106.9780364185, 112.5938639221), (-81.8117970817, 23.9841666211))
        make_face()
        with BuildLine():
            ThreePointArc((-92.5950932834, 149.6734736012), (-100.6130145672, 142.701897638), (-105.9999990268, 133.5438229737))
            ThreePointArc((-105.9999990268, 133.5438229737), (-95.6486721577, 144.5097139629), (-80.581606816, 145.1296132529))
            ThreePointArc((-80.581606816, 145.1296132529), (0, 166), (80.581606816, 145.1296132529))
            ThreePointArc((80.581606816, 145.1296132529), (95.6486731109, 144.5097135284), (105.9999997845, 133.5438210204))
            ThreePointArc((105.9999997845, 133.5438210204), (100.6130152368, 142.7018968323), (92.5950932834, 149.6734736012))
            ThreePointArc((92.5950932834, 149.6734736012), (0, 176), (-92.5950932834, 149.6734736012))
        make_face()
        with BuildLine():
            ThreePointArc((77.9039826023, 22.6276329803), (75.8083045445, 13.7149871449), (69.9604570235, 6.6701449408))
            ThreePointArc((69.9604570235, 6.6701449408), (77.2988183836, 14.3601773591), (81.8117970817, 23.9841666211))
            Line((81.8117970817, 23.9841666211), (106.9780364185, 112.5938639221))
            ThreePointArc((106.9780364185, 112.5938639221), (108.1976112852, 123.1486071561), (105.9999997845, 133.5438210204))
            ThreePointArc((105.9999997845, 133.5438210204), (107.0123207142, 129.990209539), (107.3536444198, 126.3110185474))
            ThreePointArc((107.3536444198, 126.3110185474), (104.0591212119, 115.3143351769), (95.2609399047, 107.9405346638))
            Line((95.2609399047, 107.9405346638), (74.2884904631, 34.0970663646))
            ThreePointArc((74.2884904631, 34.0970663646), (76.9787061549, 28.6405292368), (77.9039826023, 22.6276329803))
        make_face()
    extrude(amount=-F3_DEPTH)

    # F4
    f4_edges = [f1.edges().sort_by_distance(p)[0] for p in [
        (94.394917, 68.289015, 0),
        (106, 133.54382, 0),
        (0, 176, 0),
        (-106, 133.54382, 0),
        (-94.394917, 68.289015, 0),
        (-69.960457, 6.670145, 0),
        (0, 0, 0),
        (69.960457, 6.670145, 0),
        (-43.54492, 18.28974, -25),
        (65.999839, 35.255266, -25),
        (72.353644, 126.311019, -25),
        (-102.353644, 126.311019, -25),
    ]]
    fillet(f4_edges, radius=F4_R)

    # F5 (radius 5 in the source; OpenCascade refuses exactly that, so slightly less here)
    f5_edges = [f1.edges().sort_by_distance(p)[0] for p in [
        (45.847508, 38.585121, -5),
        (0, 10, -5),
        (-45.847508, 38.585121, -5),
        (-84.774715, 71.018801, -5),
        (-68.750443, 118.967933, -5),
        (0, 166, -5),
        (68.750443, 118.967933, -5),
        (84.774715, 71.018801, -5),
    ]]
    fillet(f5_edges, radius=F5_R)


solid = f1.part
